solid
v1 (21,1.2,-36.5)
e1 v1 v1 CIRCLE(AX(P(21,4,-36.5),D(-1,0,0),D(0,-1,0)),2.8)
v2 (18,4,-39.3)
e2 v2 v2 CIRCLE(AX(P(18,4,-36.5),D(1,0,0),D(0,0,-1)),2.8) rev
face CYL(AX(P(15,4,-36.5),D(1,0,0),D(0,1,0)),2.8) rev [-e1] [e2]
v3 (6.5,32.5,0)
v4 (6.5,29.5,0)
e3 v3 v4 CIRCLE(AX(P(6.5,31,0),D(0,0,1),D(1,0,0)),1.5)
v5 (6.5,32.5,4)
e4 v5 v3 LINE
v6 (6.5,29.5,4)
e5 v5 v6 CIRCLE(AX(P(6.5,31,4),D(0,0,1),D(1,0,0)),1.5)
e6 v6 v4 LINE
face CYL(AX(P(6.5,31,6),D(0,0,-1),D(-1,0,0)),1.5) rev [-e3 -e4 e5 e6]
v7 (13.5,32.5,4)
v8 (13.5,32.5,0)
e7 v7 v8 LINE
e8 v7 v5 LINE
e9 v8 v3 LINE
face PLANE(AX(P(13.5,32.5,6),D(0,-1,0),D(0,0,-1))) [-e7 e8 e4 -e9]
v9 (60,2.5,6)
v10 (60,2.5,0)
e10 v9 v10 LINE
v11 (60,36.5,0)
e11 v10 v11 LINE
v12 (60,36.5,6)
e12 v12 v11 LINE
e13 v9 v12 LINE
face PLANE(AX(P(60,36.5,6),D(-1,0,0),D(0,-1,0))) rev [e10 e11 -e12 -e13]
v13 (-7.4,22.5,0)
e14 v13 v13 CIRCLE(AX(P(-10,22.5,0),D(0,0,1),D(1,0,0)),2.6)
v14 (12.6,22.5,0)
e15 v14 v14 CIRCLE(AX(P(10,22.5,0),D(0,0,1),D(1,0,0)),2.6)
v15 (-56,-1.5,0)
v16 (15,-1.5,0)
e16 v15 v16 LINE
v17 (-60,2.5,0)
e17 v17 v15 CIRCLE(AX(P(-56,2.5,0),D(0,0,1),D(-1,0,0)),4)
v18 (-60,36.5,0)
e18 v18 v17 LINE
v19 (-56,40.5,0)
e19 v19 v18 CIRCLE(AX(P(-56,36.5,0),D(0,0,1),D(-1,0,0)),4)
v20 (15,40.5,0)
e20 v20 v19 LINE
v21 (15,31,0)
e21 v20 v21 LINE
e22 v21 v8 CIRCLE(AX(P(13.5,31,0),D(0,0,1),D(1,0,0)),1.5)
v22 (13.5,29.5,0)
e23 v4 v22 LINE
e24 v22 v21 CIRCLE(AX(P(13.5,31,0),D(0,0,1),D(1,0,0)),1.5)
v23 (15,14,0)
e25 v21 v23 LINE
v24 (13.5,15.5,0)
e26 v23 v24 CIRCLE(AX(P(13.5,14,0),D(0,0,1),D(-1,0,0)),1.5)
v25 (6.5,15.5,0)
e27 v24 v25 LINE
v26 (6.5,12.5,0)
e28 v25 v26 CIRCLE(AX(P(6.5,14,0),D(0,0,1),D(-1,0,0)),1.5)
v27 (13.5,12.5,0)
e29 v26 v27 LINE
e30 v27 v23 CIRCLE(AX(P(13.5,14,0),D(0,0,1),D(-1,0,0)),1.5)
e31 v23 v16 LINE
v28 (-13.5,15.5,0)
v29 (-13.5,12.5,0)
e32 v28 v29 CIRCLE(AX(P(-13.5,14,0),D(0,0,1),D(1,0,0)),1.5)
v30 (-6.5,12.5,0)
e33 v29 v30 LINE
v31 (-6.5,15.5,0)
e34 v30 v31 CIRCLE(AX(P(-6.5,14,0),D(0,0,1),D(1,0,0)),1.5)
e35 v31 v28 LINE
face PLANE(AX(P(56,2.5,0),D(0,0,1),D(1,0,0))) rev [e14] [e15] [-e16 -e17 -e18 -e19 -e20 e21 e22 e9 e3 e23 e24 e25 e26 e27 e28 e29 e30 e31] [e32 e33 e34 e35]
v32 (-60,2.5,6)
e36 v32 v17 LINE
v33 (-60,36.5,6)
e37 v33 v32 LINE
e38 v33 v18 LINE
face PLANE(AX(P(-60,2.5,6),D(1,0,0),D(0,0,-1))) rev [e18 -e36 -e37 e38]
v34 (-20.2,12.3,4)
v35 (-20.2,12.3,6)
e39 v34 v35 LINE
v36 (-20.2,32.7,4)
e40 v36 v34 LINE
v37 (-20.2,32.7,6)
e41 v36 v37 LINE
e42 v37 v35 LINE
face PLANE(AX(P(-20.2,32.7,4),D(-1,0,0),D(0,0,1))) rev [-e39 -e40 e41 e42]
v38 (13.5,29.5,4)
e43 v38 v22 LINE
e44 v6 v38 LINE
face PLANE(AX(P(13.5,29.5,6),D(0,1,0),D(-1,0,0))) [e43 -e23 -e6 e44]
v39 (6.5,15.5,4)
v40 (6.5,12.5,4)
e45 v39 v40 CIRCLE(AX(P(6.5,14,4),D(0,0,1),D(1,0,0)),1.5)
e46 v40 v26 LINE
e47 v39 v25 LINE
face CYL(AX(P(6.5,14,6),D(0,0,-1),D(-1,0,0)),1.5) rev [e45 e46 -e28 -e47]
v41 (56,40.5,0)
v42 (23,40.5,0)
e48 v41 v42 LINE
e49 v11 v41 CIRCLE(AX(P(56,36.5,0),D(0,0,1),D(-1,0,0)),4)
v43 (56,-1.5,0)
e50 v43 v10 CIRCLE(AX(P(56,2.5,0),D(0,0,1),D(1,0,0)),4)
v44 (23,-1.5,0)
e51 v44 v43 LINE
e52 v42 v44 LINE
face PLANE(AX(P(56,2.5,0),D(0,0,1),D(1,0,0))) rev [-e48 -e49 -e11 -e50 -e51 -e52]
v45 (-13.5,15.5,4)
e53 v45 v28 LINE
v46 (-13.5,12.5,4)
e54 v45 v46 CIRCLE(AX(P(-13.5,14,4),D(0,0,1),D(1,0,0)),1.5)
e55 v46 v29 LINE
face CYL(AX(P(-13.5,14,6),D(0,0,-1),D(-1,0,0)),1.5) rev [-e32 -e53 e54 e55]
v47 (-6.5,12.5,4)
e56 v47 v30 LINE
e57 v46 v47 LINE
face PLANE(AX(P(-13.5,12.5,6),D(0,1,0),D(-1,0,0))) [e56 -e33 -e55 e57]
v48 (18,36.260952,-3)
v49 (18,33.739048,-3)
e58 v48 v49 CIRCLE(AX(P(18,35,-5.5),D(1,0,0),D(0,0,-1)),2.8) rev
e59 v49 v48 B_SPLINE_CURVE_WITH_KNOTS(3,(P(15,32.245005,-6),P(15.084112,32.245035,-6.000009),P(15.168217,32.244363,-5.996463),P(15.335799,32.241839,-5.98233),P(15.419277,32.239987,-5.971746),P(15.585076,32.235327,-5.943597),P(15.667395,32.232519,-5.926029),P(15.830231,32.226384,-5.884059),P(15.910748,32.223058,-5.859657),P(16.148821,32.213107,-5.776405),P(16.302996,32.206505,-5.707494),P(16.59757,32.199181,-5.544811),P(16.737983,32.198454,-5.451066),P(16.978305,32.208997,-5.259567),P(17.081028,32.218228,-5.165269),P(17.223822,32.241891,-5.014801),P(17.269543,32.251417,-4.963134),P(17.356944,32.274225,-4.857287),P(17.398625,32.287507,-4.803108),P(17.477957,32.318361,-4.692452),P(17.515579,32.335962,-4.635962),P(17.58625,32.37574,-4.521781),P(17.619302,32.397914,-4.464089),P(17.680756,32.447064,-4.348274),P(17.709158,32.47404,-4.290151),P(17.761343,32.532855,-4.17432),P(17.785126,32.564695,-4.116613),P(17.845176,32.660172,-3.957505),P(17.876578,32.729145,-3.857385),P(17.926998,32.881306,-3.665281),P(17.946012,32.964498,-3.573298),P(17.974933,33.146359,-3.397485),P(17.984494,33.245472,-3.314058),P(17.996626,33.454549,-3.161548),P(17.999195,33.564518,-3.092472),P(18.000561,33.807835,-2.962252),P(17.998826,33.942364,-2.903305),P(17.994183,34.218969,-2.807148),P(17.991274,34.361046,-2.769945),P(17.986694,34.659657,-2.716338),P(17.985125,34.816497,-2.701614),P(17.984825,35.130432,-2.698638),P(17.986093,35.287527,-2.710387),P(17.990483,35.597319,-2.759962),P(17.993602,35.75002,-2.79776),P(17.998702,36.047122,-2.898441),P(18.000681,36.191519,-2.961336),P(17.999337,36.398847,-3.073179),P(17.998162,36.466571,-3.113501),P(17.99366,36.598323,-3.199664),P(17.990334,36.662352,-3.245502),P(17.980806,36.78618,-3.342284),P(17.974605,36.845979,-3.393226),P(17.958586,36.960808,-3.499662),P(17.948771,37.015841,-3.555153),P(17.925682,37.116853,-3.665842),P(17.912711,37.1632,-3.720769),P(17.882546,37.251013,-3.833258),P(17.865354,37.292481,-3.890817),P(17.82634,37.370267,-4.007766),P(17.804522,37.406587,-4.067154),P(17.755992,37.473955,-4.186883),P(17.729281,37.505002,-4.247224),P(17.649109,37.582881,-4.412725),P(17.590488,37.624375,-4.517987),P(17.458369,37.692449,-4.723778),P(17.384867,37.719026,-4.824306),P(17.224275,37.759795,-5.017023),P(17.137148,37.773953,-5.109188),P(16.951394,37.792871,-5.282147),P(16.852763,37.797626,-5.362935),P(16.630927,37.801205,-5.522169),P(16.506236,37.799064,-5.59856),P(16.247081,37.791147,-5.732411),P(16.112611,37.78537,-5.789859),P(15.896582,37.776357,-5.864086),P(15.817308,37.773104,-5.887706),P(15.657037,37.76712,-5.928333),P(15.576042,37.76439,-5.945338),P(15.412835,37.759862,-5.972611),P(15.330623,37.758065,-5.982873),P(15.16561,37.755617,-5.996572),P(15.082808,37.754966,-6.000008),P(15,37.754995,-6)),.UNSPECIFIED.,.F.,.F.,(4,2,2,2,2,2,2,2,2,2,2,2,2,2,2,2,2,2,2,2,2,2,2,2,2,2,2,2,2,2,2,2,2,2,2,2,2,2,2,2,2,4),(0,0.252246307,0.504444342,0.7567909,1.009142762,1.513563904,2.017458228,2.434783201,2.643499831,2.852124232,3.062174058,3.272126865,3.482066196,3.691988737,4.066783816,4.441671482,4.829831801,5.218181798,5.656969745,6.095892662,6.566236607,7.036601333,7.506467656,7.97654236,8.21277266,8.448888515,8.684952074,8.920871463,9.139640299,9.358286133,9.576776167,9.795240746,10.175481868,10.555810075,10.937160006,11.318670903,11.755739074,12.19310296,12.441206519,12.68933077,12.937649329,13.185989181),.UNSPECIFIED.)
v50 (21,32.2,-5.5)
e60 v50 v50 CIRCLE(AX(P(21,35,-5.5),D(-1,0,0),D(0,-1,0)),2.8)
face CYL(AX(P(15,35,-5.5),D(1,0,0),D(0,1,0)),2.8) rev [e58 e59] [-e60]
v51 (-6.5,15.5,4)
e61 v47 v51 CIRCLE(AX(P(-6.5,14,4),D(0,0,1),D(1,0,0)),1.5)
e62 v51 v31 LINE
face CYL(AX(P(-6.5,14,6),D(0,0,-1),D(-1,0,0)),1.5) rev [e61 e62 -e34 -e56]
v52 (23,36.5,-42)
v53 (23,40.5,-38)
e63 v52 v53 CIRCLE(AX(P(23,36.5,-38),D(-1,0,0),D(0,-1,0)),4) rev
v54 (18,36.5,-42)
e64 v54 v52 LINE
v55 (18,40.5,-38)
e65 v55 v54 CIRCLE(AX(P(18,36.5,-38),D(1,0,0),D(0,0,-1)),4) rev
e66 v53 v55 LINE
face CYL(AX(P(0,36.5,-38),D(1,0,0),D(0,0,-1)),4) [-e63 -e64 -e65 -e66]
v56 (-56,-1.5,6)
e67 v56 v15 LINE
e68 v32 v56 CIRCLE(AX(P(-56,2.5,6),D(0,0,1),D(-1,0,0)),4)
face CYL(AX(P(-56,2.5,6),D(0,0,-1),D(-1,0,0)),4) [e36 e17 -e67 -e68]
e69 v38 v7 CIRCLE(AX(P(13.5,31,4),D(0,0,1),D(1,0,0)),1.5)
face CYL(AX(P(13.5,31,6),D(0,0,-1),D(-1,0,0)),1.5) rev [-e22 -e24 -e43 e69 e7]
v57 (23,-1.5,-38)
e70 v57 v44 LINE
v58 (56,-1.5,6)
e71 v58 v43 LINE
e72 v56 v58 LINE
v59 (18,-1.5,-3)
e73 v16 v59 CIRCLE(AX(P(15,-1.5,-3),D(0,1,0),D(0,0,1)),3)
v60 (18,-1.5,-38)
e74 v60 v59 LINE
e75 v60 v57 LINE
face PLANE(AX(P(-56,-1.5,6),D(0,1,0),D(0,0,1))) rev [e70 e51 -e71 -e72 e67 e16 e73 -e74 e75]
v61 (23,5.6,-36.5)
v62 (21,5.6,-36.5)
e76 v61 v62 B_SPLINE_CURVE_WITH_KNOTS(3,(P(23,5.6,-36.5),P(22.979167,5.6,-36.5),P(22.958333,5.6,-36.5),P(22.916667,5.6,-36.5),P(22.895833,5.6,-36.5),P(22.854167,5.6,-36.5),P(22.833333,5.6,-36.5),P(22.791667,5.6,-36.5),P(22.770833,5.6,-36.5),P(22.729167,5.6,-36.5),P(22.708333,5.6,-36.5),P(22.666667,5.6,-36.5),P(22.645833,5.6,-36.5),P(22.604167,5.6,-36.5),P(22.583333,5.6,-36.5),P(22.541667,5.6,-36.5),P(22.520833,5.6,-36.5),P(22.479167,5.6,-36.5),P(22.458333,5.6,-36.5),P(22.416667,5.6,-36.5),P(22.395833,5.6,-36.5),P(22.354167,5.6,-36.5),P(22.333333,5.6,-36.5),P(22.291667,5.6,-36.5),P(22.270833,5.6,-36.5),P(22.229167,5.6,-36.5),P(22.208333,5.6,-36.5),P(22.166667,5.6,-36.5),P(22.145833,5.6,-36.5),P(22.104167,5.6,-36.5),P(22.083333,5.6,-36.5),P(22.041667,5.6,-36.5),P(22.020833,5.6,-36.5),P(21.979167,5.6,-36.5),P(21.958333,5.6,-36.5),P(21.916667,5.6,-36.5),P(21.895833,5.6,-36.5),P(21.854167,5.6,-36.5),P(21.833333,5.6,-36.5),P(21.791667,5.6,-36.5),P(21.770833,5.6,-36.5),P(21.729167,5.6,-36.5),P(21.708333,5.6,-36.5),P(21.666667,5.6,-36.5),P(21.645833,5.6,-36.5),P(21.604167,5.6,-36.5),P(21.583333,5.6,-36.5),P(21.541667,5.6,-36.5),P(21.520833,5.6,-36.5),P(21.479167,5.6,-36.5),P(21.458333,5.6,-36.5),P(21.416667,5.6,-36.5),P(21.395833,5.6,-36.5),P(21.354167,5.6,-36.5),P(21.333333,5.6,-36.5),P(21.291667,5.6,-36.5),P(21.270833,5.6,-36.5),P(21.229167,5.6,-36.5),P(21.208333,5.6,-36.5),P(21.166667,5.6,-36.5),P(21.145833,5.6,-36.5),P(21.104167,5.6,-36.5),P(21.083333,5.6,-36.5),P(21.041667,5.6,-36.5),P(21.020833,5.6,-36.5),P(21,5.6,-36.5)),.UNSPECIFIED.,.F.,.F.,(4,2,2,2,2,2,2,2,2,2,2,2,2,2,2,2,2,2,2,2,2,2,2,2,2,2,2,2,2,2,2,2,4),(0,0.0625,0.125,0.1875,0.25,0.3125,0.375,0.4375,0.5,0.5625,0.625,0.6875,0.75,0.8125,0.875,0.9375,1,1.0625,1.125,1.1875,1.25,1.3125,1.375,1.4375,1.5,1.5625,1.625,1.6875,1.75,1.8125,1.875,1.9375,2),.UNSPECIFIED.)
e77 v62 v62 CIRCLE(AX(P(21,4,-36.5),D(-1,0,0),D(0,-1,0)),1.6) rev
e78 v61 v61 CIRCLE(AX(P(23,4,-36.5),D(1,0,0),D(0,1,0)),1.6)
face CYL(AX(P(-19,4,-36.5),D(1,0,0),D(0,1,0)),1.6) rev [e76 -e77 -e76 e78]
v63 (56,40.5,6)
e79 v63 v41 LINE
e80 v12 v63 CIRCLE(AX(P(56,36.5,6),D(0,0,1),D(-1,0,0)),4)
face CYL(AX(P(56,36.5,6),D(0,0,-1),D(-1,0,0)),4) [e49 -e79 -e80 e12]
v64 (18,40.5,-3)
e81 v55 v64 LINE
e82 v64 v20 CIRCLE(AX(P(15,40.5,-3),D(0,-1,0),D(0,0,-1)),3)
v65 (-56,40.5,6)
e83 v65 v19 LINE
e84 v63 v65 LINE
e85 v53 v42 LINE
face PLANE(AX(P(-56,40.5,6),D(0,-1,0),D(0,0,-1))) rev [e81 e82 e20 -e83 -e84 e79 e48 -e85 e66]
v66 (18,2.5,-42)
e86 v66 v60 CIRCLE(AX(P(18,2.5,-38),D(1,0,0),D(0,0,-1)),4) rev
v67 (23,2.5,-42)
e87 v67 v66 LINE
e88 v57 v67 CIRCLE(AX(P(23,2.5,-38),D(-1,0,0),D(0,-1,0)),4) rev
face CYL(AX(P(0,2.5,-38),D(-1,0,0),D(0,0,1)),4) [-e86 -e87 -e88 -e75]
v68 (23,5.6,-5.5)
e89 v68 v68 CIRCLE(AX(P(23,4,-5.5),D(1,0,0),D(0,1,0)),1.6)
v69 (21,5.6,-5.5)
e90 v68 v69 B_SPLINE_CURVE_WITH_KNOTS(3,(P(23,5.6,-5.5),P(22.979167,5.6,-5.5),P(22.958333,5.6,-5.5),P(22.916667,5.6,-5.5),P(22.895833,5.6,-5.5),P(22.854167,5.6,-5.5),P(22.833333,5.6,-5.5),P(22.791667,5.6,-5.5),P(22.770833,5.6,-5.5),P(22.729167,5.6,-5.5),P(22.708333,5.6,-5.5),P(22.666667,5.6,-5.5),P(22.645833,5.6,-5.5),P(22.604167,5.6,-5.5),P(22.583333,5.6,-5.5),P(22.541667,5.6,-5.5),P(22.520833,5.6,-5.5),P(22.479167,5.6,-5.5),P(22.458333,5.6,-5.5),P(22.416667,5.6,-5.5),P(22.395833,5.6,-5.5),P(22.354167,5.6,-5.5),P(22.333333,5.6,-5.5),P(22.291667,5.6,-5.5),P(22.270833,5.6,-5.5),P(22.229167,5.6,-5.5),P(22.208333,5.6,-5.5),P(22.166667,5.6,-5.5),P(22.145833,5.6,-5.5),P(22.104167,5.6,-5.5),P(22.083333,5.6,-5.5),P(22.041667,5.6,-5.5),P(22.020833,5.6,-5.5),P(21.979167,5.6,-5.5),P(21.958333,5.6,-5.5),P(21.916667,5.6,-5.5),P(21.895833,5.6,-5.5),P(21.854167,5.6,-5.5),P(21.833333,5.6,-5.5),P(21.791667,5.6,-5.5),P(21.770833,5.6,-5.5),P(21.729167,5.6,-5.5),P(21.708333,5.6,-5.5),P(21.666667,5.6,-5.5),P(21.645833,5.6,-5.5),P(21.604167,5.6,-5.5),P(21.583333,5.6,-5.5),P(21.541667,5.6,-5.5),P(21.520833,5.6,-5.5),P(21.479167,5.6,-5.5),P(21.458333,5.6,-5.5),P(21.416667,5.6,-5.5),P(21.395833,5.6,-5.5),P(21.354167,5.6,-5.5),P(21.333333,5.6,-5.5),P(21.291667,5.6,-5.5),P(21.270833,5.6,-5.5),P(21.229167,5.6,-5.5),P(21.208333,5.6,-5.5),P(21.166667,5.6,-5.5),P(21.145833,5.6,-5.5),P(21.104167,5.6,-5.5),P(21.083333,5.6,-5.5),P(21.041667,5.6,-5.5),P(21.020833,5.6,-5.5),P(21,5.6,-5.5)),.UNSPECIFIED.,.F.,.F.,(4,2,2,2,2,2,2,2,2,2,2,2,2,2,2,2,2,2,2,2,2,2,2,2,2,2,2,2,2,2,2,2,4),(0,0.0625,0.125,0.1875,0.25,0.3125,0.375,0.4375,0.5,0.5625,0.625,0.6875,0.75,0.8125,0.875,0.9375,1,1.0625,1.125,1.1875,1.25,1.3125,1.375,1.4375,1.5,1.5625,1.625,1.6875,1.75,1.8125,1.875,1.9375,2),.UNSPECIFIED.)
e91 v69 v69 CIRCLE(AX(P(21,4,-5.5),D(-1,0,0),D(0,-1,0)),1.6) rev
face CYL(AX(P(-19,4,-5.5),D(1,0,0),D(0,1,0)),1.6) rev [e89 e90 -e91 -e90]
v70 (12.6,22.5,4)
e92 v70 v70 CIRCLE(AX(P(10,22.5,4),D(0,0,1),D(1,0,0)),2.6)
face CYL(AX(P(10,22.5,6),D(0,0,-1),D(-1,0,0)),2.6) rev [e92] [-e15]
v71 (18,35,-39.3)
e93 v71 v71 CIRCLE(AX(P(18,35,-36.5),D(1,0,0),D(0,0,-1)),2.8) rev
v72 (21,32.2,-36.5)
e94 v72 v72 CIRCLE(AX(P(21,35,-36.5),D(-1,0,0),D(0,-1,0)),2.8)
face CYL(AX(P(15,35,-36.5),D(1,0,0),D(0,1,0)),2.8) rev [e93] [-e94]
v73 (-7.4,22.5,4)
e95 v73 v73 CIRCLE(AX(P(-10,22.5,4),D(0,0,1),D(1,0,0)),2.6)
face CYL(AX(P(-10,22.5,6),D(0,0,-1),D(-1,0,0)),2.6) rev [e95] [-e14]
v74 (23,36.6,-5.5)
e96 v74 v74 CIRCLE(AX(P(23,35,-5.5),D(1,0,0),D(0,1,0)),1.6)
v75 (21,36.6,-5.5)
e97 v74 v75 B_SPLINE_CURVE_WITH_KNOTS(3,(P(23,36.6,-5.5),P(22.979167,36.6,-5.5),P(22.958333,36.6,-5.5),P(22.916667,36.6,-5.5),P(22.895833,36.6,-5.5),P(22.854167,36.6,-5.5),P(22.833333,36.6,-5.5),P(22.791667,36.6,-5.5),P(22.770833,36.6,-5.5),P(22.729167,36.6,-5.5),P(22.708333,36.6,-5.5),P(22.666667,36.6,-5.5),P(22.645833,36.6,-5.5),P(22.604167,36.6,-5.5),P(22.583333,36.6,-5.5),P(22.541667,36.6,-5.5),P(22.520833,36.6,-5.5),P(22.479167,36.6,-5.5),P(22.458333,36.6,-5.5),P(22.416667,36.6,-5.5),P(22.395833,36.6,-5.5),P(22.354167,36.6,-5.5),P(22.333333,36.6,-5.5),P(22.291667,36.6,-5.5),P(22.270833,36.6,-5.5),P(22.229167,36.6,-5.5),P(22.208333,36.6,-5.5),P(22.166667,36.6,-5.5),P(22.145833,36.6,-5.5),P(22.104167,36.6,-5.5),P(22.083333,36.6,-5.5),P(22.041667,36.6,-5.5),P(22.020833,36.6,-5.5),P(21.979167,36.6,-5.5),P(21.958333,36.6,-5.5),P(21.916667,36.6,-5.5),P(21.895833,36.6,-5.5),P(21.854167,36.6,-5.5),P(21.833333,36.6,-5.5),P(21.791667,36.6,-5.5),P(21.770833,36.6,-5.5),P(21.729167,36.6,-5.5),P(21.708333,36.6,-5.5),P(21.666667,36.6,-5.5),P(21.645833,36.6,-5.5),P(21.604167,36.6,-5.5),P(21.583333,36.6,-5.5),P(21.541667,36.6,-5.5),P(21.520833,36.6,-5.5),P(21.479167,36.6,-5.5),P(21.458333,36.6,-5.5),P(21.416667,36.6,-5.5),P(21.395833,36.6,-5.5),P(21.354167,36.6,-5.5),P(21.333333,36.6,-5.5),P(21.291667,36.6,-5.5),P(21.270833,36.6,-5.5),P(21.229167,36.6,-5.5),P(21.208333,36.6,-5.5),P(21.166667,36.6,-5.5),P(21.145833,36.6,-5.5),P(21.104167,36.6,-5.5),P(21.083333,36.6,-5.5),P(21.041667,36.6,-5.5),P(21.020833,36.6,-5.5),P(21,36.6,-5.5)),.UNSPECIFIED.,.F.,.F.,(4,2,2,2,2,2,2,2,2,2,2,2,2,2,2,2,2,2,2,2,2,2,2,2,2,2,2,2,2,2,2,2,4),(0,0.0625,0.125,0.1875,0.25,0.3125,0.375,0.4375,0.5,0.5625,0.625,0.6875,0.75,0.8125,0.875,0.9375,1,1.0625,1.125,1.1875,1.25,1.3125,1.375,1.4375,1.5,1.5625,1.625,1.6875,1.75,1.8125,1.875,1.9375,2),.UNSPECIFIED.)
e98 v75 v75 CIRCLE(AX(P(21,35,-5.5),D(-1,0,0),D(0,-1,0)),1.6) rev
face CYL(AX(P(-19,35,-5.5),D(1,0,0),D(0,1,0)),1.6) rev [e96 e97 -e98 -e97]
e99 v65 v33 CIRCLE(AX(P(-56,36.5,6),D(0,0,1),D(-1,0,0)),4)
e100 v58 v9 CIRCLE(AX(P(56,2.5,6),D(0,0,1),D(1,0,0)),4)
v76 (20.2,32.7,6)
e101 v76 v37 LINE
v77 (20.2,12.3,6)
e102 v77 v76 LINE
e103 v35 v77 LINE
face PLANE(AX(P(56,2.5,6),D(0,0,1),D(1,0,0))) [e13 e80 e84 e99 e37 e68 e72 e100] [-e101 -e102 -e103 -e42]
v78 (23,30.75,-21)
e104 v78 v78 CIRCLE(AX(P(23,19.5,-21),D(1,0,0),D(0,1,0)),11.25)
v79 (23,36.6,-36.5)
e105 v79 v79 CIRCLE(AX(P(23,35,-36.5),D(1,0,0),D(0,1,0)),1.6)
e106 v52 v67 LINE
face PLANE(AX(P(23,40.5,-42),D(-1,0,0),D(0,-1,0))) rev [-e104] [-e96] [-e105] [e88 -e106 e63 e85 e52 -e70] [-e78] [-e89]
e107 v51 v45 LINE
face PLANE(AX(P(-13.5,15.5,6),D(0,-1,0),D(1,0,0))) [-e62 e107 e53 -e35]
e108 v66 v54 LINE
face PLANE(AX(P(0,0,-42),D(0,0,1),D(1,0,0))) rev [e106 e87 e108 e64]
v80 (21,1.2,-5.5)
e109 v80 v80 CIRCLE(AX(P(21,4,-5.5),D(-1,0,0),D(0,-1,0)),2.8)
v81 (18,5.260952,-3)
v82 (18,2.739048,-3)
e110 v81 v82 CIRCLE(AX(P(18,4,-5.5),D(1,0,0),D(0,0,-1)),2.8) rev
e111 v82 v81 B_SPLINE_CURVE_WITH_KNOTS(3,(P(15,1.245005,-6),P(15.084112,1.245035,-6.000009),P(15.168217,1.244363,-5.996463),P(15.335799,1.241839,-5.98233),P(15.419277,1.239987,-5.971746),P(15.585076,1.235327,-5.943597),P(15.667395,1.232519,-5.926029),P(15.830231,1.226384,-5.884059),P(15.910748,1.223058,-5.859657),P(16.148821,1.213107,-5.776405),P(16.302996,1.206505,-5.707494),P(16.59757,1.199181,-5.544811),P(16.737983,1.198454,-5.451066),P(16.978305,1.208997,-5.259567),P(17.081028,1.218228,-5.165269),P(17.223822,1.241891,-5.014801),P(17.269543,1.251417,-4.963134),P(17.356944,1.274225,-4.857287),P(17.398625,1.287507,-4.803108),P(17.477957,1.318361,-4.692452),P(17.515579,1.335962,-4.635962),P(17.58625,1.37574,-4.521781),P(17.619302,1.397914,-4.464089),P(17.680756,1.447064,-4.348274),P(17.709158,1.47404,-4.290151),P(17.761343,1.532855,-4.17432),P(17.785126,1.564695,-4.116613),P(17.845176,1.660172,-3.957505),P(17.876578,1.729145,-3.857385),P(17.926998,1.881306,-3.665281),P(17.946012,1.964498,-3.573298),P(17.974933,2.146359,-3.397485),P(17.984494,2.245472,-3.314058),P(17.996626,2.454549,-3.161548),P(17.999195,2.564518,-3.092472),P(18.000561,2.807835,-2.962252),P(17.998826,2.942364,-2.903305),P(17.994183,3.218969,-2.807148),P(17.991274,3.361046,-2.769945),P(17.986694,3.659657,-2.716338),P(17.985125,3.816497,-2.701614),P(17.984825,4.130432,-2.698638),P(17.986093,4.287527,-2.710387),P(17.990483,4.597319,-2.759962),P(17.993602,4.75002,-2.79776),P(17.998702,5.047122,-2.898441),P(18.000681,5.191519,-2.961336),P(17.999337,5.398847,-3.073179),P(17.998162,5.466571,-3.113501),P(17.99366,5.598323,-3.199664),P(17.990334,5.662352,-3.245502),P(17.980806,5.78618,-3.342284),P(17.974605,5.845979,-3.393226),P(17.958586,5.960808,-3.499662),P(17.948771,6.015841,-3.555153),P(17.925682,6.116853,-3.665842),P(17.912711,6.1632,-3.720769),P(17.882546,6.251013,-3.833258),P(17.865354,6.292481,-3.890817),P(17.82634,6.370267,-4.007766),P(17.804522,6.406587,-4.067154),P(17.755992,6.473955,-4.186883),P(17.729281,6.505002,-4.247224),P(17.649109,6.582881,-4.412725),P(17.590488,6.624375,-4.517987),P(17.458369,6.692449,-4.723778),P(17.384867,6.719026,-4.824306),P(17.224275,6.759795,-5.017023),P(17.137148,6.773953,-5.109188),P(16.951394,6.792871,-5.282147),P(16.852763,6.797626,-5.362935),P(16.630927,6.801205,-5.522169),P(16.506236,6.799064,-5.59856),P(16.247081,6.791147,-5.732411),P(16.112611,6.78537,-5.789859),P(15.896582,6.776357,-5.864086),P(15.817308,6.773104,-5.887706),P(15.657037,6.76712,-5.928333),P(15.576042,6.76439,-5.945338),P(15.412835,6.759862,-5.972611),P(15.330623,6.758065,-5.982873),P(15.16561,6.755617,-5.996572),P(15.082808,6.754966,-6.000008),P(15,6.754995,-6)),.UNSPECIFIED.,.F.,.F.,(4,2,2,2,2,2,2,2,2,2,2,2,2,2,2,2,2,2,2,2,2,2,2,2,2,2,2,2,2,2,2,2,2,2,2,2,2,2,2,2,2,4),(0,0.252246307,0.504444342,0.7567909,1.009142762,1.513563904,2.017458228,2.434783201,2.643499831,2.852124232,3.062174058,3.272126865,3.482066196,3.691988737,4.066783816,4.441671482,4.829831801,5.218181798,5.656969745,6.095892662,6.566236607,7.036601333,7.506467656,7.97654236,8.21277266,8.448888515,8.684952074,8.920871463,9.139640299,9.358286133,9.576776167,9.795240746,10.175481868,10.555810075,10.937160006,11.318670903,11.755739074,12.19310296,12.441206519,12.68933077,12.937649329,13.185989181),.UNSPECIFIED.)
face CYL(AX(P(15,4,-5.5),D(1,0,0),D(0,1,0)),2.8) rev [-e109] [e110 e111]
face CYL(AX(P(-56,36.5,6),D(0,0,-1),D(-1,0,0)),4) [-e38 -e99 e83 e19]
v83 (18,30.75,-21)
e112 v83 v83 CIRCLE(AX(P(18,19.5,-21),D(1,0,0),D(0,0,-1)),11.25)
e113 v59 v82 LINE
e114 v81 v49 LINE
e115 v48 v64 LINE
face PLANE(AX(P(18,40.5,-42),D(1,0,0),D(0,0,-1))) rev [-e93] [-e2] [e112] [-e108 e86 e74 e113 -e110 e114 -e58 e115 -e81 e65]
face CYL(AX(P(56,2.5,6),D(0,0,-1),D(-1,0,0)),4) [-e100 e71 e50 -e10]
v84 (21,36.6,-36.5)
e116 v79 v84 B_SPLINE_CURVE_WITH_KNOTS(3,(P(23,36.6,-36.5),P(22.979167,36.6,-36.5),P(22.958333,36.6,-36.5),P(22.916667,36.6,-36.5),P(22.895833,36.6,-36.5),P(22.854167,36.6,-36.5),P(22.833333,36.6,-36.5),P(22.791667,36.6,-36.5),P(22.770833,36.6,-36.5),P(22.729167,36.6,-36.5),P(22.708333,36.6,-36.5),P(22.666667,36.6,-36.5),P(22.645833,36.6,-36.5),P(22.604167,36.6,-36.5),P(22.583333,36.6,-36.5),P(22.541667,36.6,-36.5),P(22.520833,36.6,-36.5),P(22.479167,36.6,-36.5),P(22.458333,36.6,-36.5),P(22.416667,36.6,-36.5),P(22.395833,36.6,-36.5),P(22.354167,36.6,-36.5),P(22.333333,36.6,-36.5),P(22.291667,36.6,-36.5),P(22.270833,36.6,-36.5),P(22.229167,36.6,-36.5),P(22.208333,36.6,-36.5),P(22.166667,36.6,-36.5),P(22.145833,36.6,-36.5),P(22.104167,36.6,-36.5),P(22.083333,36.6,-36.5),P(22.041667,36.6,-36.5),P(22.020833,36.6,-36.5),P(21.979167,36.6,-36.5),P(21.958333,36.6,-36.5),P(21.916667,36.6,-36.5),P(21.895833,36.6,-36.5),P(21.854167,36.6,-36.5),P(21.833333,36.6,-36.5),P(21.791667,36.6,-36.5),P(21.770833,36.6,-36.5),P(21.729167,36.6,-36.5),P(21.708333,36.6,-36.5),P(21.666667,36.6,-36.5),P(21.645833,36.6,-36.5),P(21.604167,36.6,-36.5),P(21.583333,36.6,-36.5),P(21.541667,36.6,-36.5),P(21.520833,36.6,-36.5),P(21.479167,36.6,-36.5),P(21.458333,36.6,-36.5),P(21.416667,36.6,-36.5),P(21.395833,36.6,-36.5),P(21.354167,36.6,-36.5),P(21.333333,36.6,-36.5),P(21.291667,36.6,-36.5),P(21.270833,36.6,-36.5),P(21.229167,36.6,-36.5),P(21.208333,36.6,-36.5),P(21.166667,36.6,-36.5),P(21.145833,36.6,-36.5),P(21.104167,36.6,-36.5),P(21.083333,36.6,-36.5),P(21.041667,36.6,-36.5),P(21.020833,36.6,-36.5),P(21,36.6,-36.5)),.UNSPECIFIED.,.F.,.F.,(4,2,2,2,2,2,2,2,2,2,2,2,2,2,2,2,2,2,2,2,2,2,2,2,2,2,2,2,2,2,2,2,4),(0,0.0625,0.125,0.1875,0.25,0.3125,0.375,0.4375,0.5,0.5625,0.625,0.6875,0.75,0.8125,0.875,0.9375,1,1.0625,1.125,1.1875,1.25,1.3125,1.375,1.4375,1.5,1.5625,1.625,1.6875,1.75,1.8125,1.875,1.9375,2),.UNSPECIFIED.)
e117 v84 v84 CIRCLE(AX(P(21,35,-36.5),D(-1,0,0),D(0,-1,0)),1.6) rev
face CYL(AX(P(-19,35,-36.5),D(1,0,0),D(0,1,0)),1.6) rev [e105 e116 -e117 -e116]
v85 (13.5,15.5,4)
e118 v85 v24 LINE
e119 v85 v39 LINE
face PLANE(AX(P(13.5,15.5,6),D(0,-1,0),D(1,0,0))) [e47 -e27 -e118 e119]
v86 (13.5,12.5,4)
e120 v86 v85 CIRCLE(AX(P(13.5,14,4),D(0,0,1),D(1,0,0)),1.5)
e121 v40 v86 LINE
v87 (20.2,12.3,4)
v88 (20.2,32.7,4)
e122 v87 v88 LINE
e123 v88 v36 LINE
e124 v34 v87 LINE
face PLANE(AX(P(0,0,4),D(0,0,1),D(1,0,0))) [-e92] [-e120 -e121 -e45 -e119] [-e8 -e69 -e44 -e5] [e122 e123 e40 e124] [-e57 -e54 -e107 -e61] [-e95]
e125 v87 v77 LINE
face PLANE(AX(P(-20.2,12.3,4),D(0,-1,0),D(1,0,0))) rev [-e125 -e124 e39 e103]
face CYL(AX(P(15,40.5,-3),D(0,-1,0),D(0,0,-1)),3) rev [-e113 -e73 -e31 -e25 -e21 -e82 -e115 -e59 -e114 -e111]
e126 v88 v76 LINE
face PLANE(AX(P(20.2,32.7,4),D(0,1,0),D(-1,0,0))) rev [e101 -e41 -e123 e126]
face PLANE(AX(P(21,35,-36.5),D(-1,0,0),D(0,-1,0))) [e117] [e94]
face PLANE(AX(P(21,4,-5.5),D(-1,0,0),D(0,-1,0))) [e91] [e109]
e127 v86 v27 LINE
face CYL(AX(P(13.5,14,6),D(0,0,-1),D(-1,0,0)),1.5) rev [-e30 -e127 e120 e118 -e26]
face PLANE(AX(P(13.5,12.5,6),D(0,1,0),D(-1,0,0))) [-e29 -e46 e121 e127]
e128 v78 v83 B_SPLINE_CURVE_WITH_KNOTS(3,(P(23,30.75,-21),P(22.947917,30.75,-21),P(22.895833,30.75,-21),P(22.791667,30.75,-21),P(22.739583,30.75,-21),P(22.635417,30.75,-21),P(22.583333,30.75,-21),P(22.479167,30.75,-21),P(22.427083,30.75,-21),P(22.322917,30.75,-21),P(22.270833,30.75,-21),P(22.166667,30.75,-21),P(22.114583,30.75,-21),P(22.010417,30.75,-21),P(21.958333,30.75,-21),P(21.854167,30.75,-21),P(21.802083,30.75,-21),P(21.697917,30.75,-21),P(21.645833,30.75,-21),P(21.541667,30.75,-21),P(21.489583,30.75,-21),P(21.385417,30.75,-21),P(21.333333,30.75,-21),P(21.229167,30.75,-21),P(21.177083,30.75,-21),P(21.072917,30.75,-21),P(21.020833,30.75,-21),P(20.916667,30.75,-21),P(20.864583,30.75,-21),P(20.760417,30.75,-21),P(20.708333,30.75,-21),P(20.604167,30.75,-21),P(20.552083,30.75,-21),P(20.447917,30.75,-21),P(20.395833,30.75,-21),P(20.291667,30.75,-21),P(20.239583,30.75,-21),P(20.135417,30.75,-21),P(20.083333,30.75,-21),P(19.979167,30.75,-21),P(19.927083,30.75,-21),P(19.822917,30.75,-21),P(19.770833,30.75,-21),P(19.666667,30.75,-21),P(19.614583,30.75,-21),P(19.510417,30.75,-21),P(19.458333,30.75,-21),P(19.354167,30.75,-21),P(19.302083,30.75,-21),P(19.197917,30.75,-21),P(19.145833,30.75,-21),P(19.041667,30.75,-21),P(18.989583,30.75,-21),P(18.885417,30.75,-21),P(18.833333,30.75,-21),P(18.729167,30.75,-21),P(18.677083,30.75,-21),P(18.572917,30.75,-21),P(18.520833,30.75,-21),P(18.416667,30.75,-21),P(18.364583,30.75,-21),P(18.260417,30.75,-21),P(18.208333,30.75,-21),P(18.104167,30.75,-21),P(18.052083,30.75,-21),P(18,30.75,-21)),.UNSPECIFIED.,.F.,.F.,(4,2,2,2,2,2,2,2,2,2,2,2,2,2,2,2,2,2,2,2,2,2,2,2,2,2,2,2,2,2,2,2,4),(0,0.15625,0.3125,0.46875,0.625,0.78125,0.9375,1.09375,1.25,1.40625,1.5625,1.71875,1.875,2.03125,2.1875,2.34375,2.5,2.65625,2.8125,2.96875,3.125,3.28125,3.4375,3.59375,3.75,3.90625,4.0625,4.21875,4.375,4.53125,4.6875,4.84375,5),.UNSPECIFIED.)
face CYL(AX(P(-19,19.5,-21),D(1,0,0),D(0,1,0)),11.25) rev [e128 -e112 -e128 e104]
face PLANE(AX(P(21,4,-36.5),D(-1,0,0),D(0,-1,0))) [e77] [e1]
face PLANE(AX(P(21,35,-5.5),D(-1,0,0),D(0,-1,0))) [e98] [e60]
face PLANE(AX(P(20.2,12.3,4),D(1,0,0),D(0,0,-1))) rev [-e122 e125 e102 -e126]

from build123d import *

# Parameters (mm, degrees)
SKETCH1_R               = 2.6
BOSS_EXTRUDE1_DEPTH     = 6
SKETCH8_W               = 40.4
SKETCH8_H               = 20.4
CUT_EXTRUDE4_DEPTH      = 2
SKETCH9_W               = 5
SKETCH9_H               = 42
BOSS_EXTRUDE2_DEPTH     = 42
FILLET1_R               = 4
FILLET2_R               = 3
SKETCH10_R              = 11.25
SKETCH10_R_2            = 1.6
CUT_EXTRUDE5_DEPTH      = 42
CUT_EXTRUDE6_DEPTH      = 3
CUT_EXTRUDE6_DEPTH_BACK = 3
SKETCH11_R              = 2.8


with BuildPart() as part:
    # Sketch1 → Boss-Extrude1 (new body)
    with BuildSketch(Plane.XY):
        with BuildLine():
            Line((-56, -1.5), (20, -1.5))
            Line((20, -1.5), (56, -1.5))
            ThreePointArc((56, -1.5), (58.828427125, -0.328427125), (60, 2.5))
            Line((60, 2.5), (60, 36.5))
            ThreePointArc((60, 36.5), (58.828427125, 39.328427125), (56, 40.5))
            Line((56, 40.5), (-56, 40.5))
            ThreePointArc((-56, 40.5), (-58.828427125, 39.328427125), (-60, 36.5))
            Line((-60, 36.5), (-60, 2.5))
            ThreePointArc((-60, 2.5), (-58.828427125, -0.328427125), (-56, -1.5))
        make_face()
        with Locations((10, 22.5)):
            Circle(SKETCH1_R, mode=Mode.SUBTRACT)
        with Locations((-10, 22.5)):
            Circle(SKETCH1_R, mode=Mode.SUBTRACT)
        with BuildLine():
            Line((-13.5, 15.5), (-6.5, 15.5))
            ThreePointArc((-6.5, 15.5), (-5, 14), (-6.5, 12.5))
            Line((-6.5, 12.5), (-13.5, 12.5))
            ThreePointArc((-13.5, 12.5), (-15, 14), (-13.5, 15.5))
        make_face(mode=Mode.SUBTRACT)
        with BuildLine():
            Line((13.5, 15.5), (6.5, 15.5))
            ThreePointArc((6.5, 15.5), (5, 14), (6.5, 12.5))
            Line((6.5, 12.5), (13.5, 12.5))
            ThreePointArc((13.5, 12.5), (15, 14), (13.5, 15.5))
        make_face(mode=Mode.SUBTRACT)
        with BuildLine():
            Line((13.5, 29.5), (6.5, 29.5))
            ThreePointArc((6.5, 29.5), (5, 31), (6.5, 32.5))
            Line((6.5, 32.5), (13.5, 32.5))
            ThreePointArc((13.5, 32.5), (15, 31), (13.5, 29.5))
        make_face(mode=Mode.SUBTRACT)
    extrude(amount=BOSS_EXTRUDE1_DEPTH)

    # Sketch8 → Cut-Extrude4 (cut)
    with BuildSketch(Plane.XY.offset(6)):
        with Locations((0, 22.5)):
            Rectangle(SKETCH8_W, SKETCH8_H)
    extrude(amount=-CUT_EXTRUDE4_DEPTH, mode=Mode.SUBTRACT)

    # Sketch9 → Boss-Extrude2 (add)
    with BuildSketch(Plane(origin=(0, 0, 0), x_dir=(-1, 0, 0), z_dir=(0, 0, -1))):
        with Locations((-20.5, 19.5)):
            Rectangle(SKETCH9_W, SKETCH9_H)
    extrude(amount=BOSS_EXTRUDE2_DEPTH)

    # Fillet1
    fillet1_edges = [part.edges().sort_by_distance(p)[0] for p in [
        (20.5, 40.5, -42),
        (20.5, -1.5, -42),
    ]]
    fillet(fillet1_edges, radius=FILLET1_R)

    # Fillet2
    fillet2_edges = [part.edges().sort_by_distance(p)[0] for p in [
        (18, 19.5, 0),
    ]]
    fillet(fillet2_edges, radius=FILLET2_R - 0.0001)  # a hair under: the kernel refuses the full size

    # Sketch10 → Cut-Extrude5 (cut)
    with BuildSketch(Plane(origin=(23, 0, 0), x_dir=(0, 0, -1), z_dir=(1, 0, 0))):
        with Locations(Location((21, 19.5, 0), (0, 0, 90))):
            Circle(SKETCH10_R)
        with Locations(Location((5.5, 35, 0), (0, 0, 90))):
            Circle(SKETCH10_R_2)
        with Locations(Location((36.5, 35, 0), (0, 0, 90))):
            Circle(SKETCH10_R_2)
        with Locations(Location((36.5, 4, 0), (0, 0, 90))):
            Circle(SKETCH10_R_2)
        with Locations(Location((5.5, 4, 0), (0, 0, 90))):
            Circle(SKETCH10_R_2)
    extrude(amount=-CUT_EXTRUDE5_DEPTH, mode=Mode.SUBTRACT)

    # Sketch11 → Cut-Extrude6 (cut, two sides: drawn at the far end of the back side and taken through both)
    with BuildSketch(Plane.ZY.offset(-18).offset(-CUT_EXTRUDE6_DEPTH_BACK)):
        with Locations(Location((-36.5, 35, 0), (0, 0, 180))):
            Circle(SKETCH11_R)
        with Locations(Location((-5.5, 35, 0), (0, 0, 26.765500577))):
            Circle(SKETCH11_R)
        with Locations(Location((-5.5, 4, 0), (0, 0, 26.765500577))):
            Circle(SKETCH11_R)
        with Locations(Location((-36.5, 4, 0), (0, 0, 180))):
            Circle(SKETCH11_R)
    extrude(amount=CUT_EXTRUDE6_DEPTH + CUT_EXTRUDE6_DEPTH_BACK, mode=Mode.SUBTRACT)


solid = part.part
